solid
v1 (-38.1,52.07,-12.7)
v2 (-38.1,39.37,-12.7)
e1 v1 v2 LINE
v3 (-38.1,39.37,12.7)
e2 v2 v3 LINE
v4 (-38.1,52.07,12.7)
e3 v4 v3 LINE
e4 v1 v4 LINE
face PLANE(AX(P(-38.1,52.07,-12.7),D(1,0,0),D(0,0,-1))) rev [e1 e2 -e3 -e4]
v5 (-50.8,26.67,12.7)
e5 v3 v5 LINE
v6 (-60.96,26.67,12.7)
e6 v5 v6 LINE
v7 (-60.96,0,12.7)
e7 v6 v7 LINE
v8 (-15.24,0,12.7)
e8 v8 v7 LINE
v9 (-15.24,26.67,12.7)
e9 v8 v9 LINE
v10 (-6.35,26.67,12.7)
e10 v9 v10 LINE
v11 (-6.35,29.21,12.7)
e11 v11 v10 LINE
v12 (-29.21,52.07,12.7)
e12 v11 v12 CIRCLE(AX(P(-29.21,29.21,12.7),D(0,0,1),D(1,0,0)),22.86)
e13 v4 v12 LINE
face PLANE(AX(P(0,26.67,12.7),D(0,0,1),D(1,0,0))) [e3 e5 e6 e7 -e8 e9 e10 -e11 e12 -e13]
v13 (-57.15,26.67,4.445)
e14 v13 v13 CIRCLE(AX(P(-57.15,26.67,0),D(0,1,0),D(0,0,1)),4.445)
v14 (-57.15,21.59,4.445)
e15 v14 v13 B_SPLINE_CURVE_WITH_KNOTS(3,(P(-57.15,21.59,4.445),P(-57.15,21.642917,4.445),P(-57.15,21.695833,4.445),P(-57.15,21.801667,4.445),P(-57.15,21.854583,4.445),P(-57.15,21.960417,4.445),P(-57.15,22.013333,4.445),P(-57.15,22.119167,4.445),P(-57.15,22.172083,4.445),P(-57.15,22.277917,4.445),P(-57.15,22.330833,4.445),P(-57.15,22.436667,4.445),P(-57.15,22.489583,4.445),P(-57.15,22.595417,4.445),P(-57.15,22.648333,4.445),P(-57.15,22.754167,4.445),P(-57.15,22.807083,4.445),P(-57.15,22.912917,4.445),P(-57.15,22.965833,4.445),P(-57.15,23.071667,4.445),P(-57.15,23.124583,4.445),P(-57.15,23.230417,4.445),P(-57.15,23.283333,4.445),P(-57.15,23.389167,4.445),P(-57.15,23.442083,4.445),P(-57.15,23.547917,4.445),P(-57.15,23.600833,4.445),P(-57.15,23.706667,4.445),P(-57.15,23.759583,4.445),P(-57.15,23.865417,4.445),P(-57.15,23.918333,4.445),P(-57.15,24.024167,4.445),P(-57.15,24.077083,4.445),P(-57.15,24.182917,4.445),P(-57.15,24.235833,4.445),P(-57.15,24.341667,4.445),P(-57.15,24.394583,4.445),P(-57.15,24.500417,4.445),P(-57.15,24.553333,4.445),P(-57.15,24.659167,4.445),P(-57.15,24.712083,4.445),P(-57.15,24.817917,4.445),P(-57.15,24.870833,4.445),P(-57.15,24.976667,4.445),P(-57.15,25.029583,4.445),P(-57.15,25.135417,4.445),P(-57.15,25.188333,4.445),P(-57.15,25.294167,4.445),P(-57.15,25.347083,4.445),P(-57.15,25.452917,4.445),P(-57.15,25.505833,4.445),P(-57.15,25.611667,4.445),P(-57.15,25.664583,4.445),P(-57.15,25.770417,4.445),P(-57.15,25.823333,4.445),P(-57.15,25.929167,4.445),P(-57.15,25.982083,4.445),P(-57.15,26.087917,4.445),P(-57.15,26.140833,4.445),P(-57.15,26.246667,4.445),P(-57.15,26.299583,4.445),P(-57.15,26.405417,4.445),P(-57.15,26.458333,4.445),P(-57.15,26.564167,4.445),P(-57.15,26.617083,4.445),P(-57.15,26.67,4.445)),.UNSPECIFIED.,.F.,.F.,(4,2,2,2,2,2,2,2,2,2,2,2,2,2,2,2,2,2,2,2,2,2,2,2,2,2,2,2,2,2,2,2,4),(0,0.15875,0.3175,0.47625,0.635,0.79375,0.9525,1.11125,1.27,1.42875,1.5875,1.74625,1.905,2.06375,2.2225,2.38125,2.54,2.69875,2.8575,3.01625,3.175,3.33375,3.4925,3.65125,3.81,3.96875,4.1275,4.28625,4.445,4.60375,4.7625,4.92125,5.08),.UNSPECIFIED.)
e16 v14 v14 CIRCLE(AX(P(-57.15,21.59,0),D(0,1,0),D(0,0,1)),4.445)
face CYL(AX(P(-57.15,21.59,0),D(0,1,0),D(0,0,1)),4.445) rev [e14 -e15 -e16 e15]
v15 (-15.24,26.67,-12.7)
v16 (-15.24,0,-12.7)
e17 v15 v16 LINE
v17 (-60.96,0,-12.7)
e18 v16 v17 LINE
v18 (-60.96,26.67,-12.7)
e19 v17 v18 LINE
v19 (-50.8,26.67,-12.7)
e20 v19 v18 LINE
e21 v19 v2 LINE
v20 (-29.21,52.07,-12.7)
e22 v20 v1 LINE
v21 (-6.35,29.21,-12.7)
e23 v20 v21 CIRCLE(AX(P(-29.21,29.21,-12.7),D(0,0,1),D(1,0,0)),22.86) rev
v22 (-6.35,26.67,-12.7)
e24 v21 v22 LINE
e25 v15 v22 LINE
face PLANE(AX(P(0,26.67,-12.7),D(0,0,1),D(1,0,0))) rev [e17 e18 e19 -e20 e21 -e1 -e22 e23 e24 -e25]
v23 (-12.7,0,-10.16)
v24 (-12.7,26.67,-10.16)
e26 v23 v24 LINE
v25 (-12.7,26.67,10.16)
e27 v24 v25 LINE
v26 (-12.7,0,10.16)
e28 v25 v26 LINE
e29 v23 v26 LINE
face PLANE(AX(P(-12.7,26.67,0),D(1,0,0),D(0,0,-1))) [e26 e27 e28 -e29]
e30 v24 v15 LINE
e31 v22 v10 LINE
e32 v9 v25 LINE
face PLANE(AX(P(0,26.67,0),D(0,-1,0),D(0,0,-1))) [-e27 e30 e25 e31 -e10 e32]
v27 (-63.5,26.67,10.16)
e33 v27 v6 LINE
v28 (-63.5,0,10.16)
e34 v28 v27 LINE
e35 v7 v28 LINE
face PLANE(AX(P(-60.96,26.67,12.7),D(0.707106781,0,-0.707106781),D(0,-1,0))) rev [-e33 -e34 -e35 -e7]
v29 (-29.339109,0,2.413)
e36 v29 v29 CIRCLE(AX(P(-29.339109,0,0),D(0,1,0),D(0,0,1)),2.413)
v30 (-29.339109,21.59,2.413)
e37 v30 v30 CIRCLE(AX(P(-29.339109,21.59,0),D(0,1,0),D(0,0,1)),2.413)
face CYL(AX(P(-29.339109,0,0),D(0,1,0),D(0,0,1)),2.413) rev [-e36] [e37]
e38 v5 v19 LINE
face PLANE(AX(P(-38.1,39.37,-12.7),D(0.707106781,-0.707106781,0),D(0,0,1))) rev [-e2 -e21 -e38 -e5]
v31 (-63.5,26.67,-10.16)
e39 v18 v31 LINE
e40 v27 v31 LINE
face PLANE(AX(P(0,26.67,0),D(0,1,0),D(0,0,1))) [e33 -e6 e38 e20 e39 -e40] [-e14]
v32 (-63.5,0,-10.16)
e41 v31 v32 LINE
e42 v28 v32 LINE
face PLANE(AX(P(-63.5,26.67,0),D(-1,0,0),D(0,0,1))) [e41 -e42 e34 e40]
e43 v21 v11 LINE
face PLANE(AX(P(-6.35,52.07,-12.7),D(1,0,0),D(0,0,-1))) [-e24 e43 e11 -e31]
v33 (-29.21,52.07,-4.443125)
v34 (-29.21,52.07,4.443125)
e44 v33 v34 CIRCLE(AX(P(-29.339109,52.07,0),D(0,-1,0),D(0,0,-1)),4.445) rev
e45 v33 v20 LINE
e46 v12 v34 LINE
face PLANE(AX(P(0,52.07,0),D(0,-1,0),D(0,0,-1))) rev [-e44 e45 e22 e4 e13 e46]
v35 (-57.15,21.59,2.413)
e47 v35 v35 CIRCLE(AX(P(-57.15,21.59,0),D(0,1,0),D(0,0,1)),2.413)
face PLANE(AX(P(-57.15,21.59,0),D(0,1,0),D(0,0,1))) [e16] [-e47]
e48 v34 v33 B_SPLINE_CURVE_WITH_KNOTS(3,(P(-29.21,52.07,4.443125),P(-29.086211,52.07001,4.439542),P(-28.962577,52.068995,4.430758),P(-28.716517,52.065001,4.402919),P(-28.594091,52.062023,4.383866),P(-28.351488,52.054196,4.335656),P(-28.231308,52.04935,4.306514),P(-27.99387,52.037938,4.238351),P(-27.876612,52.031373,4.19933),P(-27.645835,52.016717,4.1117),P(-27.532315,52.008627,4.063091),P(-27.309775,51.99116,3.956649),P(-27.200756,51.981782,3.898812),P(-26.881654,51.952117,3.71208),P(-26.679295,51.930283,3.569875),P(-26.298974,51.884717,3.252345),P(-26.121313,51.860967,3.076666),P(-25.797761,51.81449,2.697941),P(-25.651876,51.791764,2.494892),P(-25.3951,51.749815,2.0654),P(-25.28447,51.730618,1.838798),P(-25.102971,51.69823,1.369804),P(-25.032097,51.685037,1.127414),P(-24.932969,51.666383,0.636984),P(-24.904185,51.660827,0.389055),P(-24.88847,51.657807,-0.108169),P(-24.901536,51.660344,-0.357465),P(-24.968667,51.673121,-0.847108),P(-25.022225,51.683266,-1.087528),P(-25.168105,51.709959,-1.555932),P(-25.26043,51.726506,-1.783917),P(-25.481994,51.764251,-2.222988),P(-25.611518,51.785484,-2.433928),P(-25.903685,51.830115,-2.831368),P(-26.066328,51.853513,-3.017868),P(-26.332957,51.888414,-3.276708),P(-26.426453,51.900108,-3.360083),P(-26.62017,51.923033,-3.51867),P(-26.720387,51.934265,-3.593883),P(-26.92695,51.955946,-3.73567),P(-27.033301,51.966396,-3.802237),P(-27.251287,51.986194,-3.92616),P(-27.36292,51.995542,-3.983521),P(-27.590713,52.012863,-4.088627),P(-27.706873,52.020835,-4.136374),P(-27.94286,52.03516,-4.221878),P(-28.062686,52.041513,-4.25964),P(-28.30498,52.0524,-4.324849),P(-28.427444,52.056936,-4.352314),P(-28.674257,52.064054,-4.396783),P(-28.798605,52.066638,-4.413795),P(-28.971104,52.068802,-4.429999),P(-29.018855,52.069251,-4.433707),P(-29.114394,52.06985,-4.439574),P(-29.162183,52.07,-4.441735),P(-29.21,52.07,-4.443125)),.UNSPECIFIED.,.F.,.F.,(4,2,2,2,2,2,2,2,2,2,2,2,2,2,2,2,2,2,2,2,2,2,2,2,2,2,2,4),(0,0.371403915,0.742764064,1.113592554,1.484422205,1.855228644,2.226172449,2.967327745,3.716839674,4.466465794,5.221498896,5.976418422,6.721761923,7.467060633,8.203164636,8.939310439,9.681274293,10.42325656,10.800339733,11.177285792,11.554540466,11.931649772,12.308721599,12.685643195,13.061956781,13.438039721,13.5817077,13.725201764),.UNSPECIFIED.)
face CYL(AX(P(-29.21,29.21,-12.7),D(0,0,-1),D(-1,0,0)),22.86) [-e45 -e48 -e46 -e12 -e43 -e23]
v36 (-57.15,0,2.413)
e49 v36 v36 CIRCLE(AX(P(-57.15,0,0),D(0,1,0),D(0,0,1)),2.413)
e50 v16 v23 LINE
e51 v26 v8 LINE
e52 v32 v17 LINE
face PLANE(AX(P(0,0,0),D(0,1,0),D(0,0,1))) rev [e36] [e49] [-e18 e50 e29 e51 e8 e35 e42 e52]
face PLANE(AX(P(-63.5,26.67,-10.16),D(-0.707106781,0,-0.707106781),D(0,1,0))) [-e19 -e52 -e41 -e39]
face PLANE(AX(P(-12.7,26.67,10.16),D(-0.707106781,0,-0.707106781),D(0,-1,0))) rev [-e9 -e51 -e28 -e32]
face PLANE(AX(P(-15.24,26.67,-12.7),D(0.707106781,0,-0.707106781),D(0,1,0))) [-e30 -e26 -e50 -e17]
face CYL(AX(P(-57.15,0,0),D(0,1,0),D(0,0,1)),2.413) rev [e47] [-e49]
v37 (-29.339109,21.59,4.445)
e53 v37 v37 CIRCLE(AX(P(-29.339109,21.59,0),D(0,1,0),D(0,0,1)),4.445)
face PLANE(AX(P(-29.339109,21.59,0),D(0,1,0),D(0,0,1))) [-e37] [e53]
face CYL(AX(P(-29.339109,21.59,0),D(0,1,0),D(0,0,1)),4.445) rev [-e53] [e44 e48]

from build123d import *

# Parameters (mm, degrees)
SKETCH1_W               = 50.8
SKETCH1_H               = 25.4
BOSS_EXTRUDE1_DEPTH     = 26.67
SKETCH2_W               = 6.35
SKETCH2_H               = 25.4
BOSS_EXTRUDE2_DEPTH     = 25.4
SKETCH3_W               = 25.4
SKETCH3_H               = 25.4
BOSS_EXTRUDE3_DEPTH     = 25.4
CHAMFER1_SIZE           = 12.7
SKETCH4_R               = 2.413
CUT_EXTRUDE1_DEPTH      = 71.034483649
SKETCH4_4_R             = 4.445
SKETCH4_4_R_2           = 2.413
CUT_EXTRUDE2_DEPTH      = 5.08
CUT_EXTRUDE3_DEPTH      = 29.972
CUT_EXTRUDE3_DEPTH_BACK = 1.27
CUT_EXTRUDE3_START      = -25.4
SKETCH5_R               = 4.445
CHAMFER3_SIZE           = 2.54
FILLET1_R               = 22.86


with BuildPart() as part:
    # Sketch1 → Boss-Extrude1 (new body)
    with BuildSketch(Plane(origin=(0, 0, 0), x_dir=(1, 0, 0), z_dir=(0, 1, 0))):
        with Locations((-38.1, 0)):
            Rectangle(SKETCH1_W, SKETCH1_H)
    extrude(amount=BOSS_EXTRUDE1_DEPTH)



with BuildPart() as body_2:
    # Sketch2 → Boss-Extrude2 (new body)
    with BuildSketch(Plane(origin=(0, 26.67, 0), x_dir=(1, 0, 0), z_dir=(0, 1, 0))):
        with Locations((-9.525, 0)):
            Rectangle(SKETCH2_W, SKETCH2_H)
    extrude(amount=BOSS_EXTRUDE2_DEPTH)


with BuildPart() as part_1:
    add(part.part)

    add(body_2.part)  # Boss-Extrude3 merges body 2
    # Sketch3 → Boss-Extrude3 (add)
    with BuildSketch(Plane(origin=(0, 26.67, 0), x_dir=(1, 0, 0), z_dir=(0, 1, 0))):
        with Locations((-25.4, 0)):
            Rectangle(SKETCH3_W, SKETCH3_H)
    extrude(amount=BOSS_EXTRUDE3_DEPTH)

    # Chamfer1
    chamfer1_edges = [part_1.edges().sort_by_distance(p)[0] for p in [
        (-38.1, 26.67, 0),
    ]]
    chamfer(chamfer1_edges, length=CHAMFER1_SIZE)

    # Sketch4 → Cut-Extrude1 (cut, through all)
    with BuildSketch(Plane(origin=(0, 26.67, 0), x_dir=(1, 0, 0), z_dir=(0, 1, 0))):
        with Locations(Location((-57.15, 0, 0), (0, 0, 270))):
            Circle(SKETCH4_R)
        with Locations(Location((-29.339108581, 0, 0), (0, 0, 270))):
            Circle(SKETCH4_R)
    extrude(amount=-CUT_EXTRUDE1_DEPTH, mode=Mode.SUBTRACT)

    # Sketch4<4> → Cut-Extrude2 (cut)
    # profile 1 of 2: a face of its own
    with BuildSketch(Plane(origin=(0, 26.67, 0), x_dir=(1, 0, 0), z_dir=(0, 1, 0))):
        with Locations(Location((-57.15, 0, 0), (0, 0, 270))):
            Circle(SKETCH4_4_R)
        with Locations(Location((-57.15, 0, 0), (0, 0, 270))):
            Circle(SKETCH4_4_R_2, mode=Mode.SUBTRACT)
    # profile 2 of 2: a face of its own
    with BuildSketch(Plane(origin=(0, 26.67, 0), x_dir=(1, 0, 0), z_dir=(0, 1, 0))):
        with Locations(Location((-29.339108581, 0, 0), (0, 0, 270))):
            Circle(SKETCH4_4_R)
        with Locations(Location((-29.339108581, 0, 0), (0, 0, 270))):
            Circle(SKETCH4_4_R_2, mode=Mode.SUBTRACT)
    extrude(amount=-CUT_EXTRUDE2_DEPTH, mode=Mode.SUBTRACT)

    # Sketch5 → Cut-Extrude3 (cut, two sides: drawn at the far end of the back side and taken through both)
    with BuildSketch(Plane(origin=(0, 52.07, 0), x_dir=(1, 0, 0), z_dir=(0, 1, 0)).offset(CUT_EXTRUDE3_START - CUT_EXTRUDE3_DEPTH_BACK)):
        with Locations(Location((-29.339108581, 0, 0), (0, 0, 270))):
            Circle(SKETCH5_R)
    extrude(amount=CUT_EXTRUDE3_DEPTH + CUT_EXTRUDE3_DEPTH_BACK, mode=Mode.SUBTRACT)

    # Chamfer3
    chamfer3_edges = [part_1.edges().sort_by_distance(p)[0] for p in [
        (-12.7, 13.335, -12.7),
        (-12.7, 13.335, 12.7),
        (-63.5, 13.335, -12.7),
        (-63.5, 13.335, 12.7),
    ]]
    chamfer(chamfer3_edges, length=CHAMFER3_SIZE)

    # Fillet1
    # the kernel refuses this fillet: 22.86 mm, written as the material it takes off along each edge
    with BuildSketch(Plane(origin=(-6.35, 52.07, -69.85), x_dir=(-1, 0, 0), z_dir=(0, 0, 1))) as fillet1_piece_1:
        with BuildLine():
            CenterArc((FILLET1_R, FILLET1_R), FILLET1_R, 180, 90)
            Line((0, FILLET1_R), (0, 0))
            Line((0, 0), (FILLET1_R, 0))
        make_face()
    extrude(amount=139.7, mode=Mode.SUBTRACT)


solid = part_1.part
